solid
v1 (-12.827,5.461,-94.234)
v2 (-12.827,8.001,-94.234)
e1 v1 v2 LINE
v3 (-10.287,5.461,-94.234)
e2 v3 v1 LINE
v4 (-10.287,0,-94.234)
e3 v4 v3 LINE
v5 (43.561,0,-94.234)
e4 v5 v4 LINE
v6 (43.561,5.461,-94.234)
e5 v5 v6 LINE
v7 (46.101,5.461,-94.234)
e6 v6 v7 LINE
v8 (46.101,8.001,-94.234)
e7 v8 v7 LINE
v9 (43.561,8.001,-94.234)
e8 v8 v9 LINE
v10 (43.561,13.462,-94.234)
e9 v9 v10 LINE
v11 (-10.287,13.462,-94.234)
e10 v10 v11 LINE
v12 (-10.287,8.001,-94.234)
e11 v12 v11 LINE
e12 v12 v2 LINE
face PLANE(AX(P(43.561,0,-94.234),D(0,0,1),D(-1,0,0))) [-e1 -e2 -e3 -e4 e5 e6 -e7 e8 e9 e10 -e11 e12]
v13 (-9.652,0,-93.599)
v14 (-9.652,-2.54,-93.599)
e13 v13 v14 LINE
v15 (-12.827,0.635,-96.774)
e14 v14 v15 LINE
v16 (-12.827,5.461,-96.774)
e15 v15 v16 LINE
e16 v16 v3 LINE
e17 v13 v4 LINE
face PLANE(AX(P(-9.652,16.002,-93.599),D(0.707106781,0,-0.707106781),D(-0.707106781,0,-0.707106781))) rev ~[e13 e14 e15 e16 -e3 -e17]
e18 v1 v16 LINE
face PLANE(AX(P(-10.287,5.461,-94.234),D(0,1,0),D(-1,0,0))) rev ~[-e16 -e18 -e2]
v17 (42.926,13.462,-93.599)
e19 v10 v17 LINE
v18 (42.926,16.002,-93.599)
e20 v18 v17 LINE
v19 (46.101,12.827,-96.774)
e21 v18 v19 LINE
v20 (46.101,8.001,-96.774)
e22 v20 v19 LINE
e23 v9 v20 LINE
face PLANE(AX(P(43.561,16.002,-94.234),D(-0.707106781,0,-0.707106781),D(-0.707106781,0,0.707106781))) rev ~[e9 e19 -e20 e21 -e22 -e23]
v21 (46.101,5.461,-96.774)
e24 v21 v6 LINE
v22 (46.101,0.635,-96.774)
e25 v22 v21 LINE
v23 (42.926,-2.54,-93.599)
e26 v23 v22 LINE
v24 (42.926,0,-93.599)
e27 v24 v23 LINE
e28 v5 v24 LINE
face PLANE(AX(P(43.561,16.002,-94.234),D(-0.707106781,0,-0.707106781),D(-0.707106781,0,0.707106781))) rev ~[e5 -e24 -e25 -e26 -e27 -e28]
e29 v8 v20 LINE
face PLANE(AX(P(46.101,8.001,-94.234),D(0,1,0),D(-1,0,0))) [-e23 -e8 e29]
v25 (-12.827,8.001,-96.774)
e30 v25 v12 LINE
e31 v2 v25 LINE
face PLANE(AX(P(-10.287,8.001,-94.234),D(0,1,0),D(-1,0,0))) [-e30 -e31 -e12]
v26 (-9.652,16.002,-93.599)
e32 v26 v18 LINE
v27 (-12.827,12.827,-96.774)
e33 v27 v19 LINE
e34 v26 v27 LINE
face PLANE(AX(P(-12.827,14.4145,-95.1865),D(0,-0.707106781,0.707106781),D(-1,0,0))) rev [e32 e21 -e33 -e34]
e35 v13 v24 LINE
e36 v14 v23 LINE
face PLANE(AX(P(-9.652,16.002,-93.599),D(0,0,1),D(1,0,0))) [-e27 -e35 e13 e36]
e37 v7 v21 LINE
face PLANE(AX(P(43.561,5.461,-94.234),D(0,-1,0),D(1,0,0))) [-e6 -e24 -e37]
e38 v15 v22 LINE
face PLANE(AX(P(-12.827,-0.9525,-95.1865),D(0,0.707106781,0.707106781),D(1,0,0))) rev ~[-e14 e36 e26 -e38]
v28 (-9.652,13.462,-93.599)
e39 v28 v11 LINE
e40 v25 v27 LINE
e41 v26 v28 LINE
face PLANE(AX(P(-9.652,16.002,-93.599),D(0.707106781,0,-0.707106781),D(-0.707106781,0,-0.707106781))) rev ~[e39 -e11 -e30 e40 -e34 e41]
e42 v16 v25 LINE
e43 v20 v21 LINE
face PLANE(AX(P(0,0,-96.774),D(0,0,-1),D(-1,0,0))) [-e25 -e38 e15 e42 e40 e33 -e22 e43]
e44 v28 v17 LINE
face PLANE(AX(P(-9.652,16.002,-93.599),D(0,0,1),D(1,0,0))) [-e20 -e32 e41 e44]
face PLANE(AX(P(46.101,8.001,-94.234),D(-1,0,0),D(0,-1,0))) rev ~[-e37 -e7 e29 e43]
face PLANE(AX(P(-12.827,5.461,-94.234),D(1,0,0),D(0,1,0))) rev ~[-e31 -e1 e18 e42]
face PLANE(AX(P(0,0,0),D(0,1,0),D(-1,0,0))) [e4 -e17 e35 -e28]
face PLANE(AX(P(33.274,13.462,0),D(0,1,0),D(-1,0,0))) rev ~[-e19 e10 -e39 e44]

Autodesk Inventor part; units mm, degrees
ref_plane "YZ Plane" through (0, 0, 0) normal (1, 0, 0) x (0, 1, 0)
ref_plane "XZ Plane" through (0, 0, 0) normal (0, 1, 0) x (-1, 0, 0)
sketch "Sketch1" plane through (0, 0, 0) normal (0, 0, 1) x (1, 0, 0)
  line L0 (0, 0) -> (33.274, 0)
  line L1 (33.274, 0) -> (33.274, 13.462)
  line L2 (33.274, 13.462) -> (0, 13.462)
  line L3 (0, 13.462) -> (0, 0)
  line L4 (-2.54, 16.002) -> (35.814, 16.002)
  line L5 (35.814, 16.002) -> (35.814, -2.54)
  line L6 (35.814, -2.54) -> (-2.54, -2.54)
  line L7 (-2.54, -2.54) -> (-2.54, 16.002)
  dimension "d0" = 33.274
  dimension "d1" = 13.462
  dimension "d2" = 2.54
extrude "Extrusion1" add sketch "Sketch1" against normal blind 13.208
sketch "Sketch3" plane through (0, 0, 0) normal (0, 0, 1) x (1, 0, 0)
  line L0 (14.986, 16.002) -> (14.986, 13.462)
  line L1 (0, 13.462) -> (33.274, 13.462)
  line L2 (35.814, 16.002) -> (-2.54, 16.002)
  line L3 (-2.54, 16.002) -> (-2.54, -2.54)
  line L4 (18.288, 16.002) -> (18.288, 13.462)
  line L5 (35.814, -2.54) -> (35.814, 16.002)
  line L6 (14.986, 16.002) -> (18.288, 16.002)
  line L7 (18.288, 13.462) -> (14.986, 13.462)
  line L8 (33.274, 13.462) -> (33.274, 0)
  line L9 (0, 0) -> (0, 13.462)
  dimension "d5" = 0
  dimension "d6" = 0
  dimension "d7" = 14.986
  dimension "d8" = 14.986
extrude "Extrusion2" cut sketch "Sketch3" against normal blind 7.62
sketch "Sketch4" plane through (0, 0, 0) normal (0, 1, 0) x (-1, 0, 0)
  line L0 (10.287, -23.368) -> (-43.561, -23.368)
  line L1 (-43.561, -23.368) -> (-43.561, -94.234)
  line L2 (-43.561, -94.234) -> (10.287, -94.234)
  line L3 (10.287, -94.234) -> (10.287, -23.368)
  circle A0 centre (-41.529, -25.4) radius 1.016
  circle A1 centre (8.255, -25.4) radius 1.016
  circle A2 centre (8.255, -92.202) radius 1.016
  circle A3 centre (-41.529, -92.202) radius 1.016
  line L4 (-33.274, -13.208) -> (0, -13.208) projected
  line L5 (-16.637, -13.208) -> (-16.637, -16.4825)
  point P0 (0, 0)
  dimension "d11" = 53.848
  dimension "d12" = 70.866
  dimension "d14" = 2.032
  dimension "d15" = 2.032
  dimension "d16" = 2.032
  dimension "d17" = 2.032
  dimension "d18" = 2.032
  dimension "d19" = 2.032
  dimension "d20" = 2.032
  dimension "d21" = 2.032
  dimension "d22" = 2.032
  dimension "d23" = 2.032
  dimension "d24" = 2.032
  dimension "d25" = 2.032
  dimension "d26" = 26.924
  dimension "d27" = 10.16
ref_plane "Work Plane1" through (0, 0, -23.368) normal (0, 0, -1) x (-1, 0, 0)
sketch "Sketch5" plane through (0, 0, -23.368) normal (0, 0, -1) x (-1, 0, 0)
  line L0 (10.287, 0) -> (-43.561, 0) projected
  line L1 (-43.561, 0) -> (10.287, 0)
  line L2 (10.287, 13.462) -> (10.287, 0)
  line L3 (10.287, 0) -> (-43.561, 0)
  line L4 (12.827, -2.54) -> (-46.101, -2.54)
  line L5 (-46.101, -2.54) -> (-46.101, 16.002)
  line L6 (-46.101, -2.54) -> (12.827, -2.54)
  line L7 (12.827, -2.54) -> (12.827, 16.002)
  line L8 (12.827, 16.002) -> (-46.101, 16.002)
  line L9 (-46.101, 16.002) -> (-46.101, -2.54)
  line L10 (10.287, 0) -> (-43.561, 0)
  line L11 (-43.561, 0) -> (-43.561, 13.462)
  line L12 (-43.561, 13.462) -> (10.287, 13.462)
  line L13 (10.287, 13.462) -> (10.287, 0)
  point P0 (0, 0)
sketch "Sketch6" plane through (0, 0, -13.208) normal (0, 0, -1) x (-1, 0, 0)
  line L0 (-35.814, -2.54) -> (2.54, -2.54) projected
  line L1 (2.54, -2.54) -> (2.54, 16.002) projected
  line L2 (2.54, 16.002) -> (-35.814, 16.002) projected
  line L3 (-35.814, 16.002) -> (-35.814, -2.54) projected
  line L4 (0, 13.462) -> (0, 0) projected
  line L5 (0, 0) -> (-33.274, 0) projected
  line L6 (-33.274, 0) -> (-33.274, 13.462) projected
  line L7 (-33.274, 13.462) -> (0, 13.462) projected
extrude "Extrusion3" add sketch "Sketch5" along normal blind 73.406
sketch "Sketch7" plane through (0, 0, -23.368) normal (0, 0, 1) x (1, 0, 0)
  line L0 (46.101, 16.002) -> (46.101, -2.54) projected
  line L1 (-12.827, 16.002) -> (46.101, 16.002) projected
  line L2 (-12.827, -2.54) -> (-12.827, 16.002) projected
  line L3 (46.101, -2.54) -> (-12.827, -2.54) projected
  line L4 (43.561, 13.462) -> (-10.287, 13.462) projected
  line L5 (43.561, 0) -> (43.561, 13.462) projected
  line L6 (-10.287, 0) -> (43.561, 0) projected
  line L7 (-10.287, 13.462) -> (-10.287, 0) projected
  point P0 (0, 0)
sketch "Sketch8" plane through (0, 0, -23.368) normal (0, 0, 1) x (1, 0, 0)
  point P0 (0, 0)
sketch "Sketch9" plane through (0, 0, 0) normal (0, 1, 0) x (-1, 0, 0)
  line L0 (2.54, -13.208) -> (-35.814, -13.208) projected
  line L1 (12.827, -23.368) -> (2.54, -13.208)
  line L2 (2.54, -13.208) -> (-35.814, -13.208)
  line L3 (-45.8486, -23.368) -> (12.827, -23.368)
  line L4 (-35.814, 0) -> (-35.814, -13.208) projected
  line L5 (-46.101, -23.368) -> (12.827, -23.368) projected
  line L6 (-35.814, -13.208) -> (-46.101, -23.368)
  line L7 (-46.101, -23.368) -> (12.827, -23.368)
  point P0 (0, 0)
extrude "Extrusion5" add sketch "Sketch9" against normal blind 2.54
sketch "Sketch11" plane through (0, 0, 0) normal (0, 1, 0) x (1, 0, 0)
  line L0 (33.274, 0) -> (0, 0) projected
  line L1 (33.274, 0) -> (33.274, 13.208) projected
  line L2 (35.814, 13.208) -> (33.274, 13.208) projected
  line L3 (35.814, 13.208) -> (46.101, 23.368) projected
  line L4 (43.561, 23.368) -> (46.101, 23.368) projected
  line L5 (43.561, 23.368) -> (43.561, 96.774) projected
  line L6 (-10.287, 96.774) -> (43.561, 96.774) projected
  line L7 (-10.287, 23.368) -> (-10.287, 96.774) projected
  line L8 (-12.827, 23.368) -> (-10.287, 23.368) projected
  line L9 (-12.827, 23.368) -> (-2.54, 13.208) projected
  line L10 (0, 13.208) -> (-2.54, 13.208) projected
  line L11 (0, 0) -> (0, 13.208) projected
  line L12 (-12.827, 23.368) -> (-2.54, 13.208) projected
  line L13 (-11.0421, 25.1752) -> (0, 14.2694)
  line L14 (0, 0) -> (0, 13.208) projected
  line L15 (0, 13.208) -> (0, 14.2694)
  line L16 (-10.287, 23.368) -> (-10.287, 96.774) projected
  line L17 (-10.287, 24.4294) -> (-10.287, 23.368)
  line L18 (-12.827, 23.368) -> (-10.287, 23.368) projected
  line L19 (-10.287, 23.368) -> (-12.827, 23.368)
  line L20 (-2.54, 0) -> (-2.54, 13.208) projected
  line L21 (-12.827, 23.368) -> (-2.54, 13.208)
  line L22 (-2.54, 13.208) -> (0, 13.208)
  line L23 (16.637, 13.208) -> (16.637, 17.9384)
  line L24 (46.101, 23.368) -> (43.561, 23.368)
  line L25 (46.101, 23.368) -> (35.814, 13.208)
  line L26 (44.3161, 25.1752) -> (33.274, 14.2694)
  line L27 (33.274, 13.208) -> (33.274, 14.2694)
  line L28 (43.561, 24.4294) -> (43.561, 23.368)
  line L29 (35.814, 13.208) -> (33.274, 13.208)
  point P0 (43.561, 24.4294)
  dimension "d40" = 2.54
extrude "Extrusion7" add sketch "Sketch11" along normal up to surface (13.462 mm away) contours L27 L26 L5 L4 L3 L2 | L10 L9 L8 L7 L13 L15
sketch "Sketch12" plane through (-12.827, 13.462, -23.368) normal (0, 1, 0) x (1, 0, 0)
  line L0 (58.928, 0) -> (55.3134, 0) projected
  line L1 (55.3134, 0) -> (46.101, -9.0986) projected
  line L2 (46.101, -9.0986) -> (46.101, -10.16) projected
  line L3 (48.641, -10.16) -> (46.101, -10.16) projected
  line L4 (48.641, -10.16) -> (58.928, 0) projected
  line L5 (3.6146, 0) -> (0, 0) projected
  line L6 (0, 0) -> (10.287, -10.16) projected
  line L7 (12.827, -10.16) -> (10.287, -10.16) projected
  line L8 (12.827, -10.16) -> (12.827, -9.0986) projected
  line L9 (12.827, -9.0986) -> (3.6146, 0) projected
  line L10 (12.827, -23.368) -> (12.827, -10.16) projected
  line L11 (12.827, -10.16) -> (46.101, -10.16)
  line L12 (55.3134, 0) -> (3.6146, 0) projected
  line L13 (55.3134, 0) -> (3.6146, 0)
extrude "Extrusion8" add sketch "Sketch12" along normal blind 2.54
sketch "Sketch13" plane through (0, 0, 0) normal (0, 1, 0) x (1, 0, 0)
  line L0 (43.561, 94.234) -> (-10.287, 94.234) projected
  line L1 (46.101, 96.774) -> (-12.827, 96.774) projected
  line L2 (-10.287, 94.234) -> (43.561, 94.234)
  line L3 (43.561, 94.234) -> (43.561, 96.774)
  line L4 (43.561, 96.774) -> (-10.287, 96.774)
  line L5 (-10.287, 96.774) -> (-10.287, 94.234)
  point P0 (0, 0)
  point P1 (-10.287, 96.774)
extrude "Extrusion9" add sketch "Sketch13" along normal up to next
chamfer "Chamfer1" distance 3.175 angle 45 14 edges at (-12.827, 16.002, -60.071) (46.101, 16.002, -60.071) (46.101, -2.54, -60.071) (-12.827, -2.54, -60.071) (16.637, 16.002, -96.774) (16.637, -2.54, -96.774) (40.9575, 16.002, -18.288) (40.9575, -2.54, -18.288) (-7.6835, 16.002, -18.288) (-7.6835, -2.54, -18.288) (35.814, 16.002, -6.604) (35.814, -2.54, -6.604) (-2.54, 16.002, -6.604) (-2.54, -2.54, -6.604)
sketch "Sketch15" plane through (14.986, 16.002, -7.62) normal (0, 1, 0) x (1, 0, 0)
  line L0 (17.653, 6.9147) -> (17.653, -7.62)
  line L1 (17.653, -7.62) -> (20.828, -7.62)
  line L2 (20.828, -7.62) -> (20.828, 5.588)
  line L3 (20.828, 5.588) -> (17.653, 6.9147)
  line L4 (17.653, 6.9147) -> (17.653, -7.62)
  line L5 (27.94, 17.0747) -> (17.653, 6.9147)
  line L6 (27.94, 85.979) -> (27.94, 17.0747)
  line L7 (-24.638, 85.979) -> (27.94, 85.979)
  line L8 (-24.638, 17.0747) -> (-24.638, 85.979)
  line L9 (-14.351, 6.9147) -> (-24.638, 17.0747)
  line L10 (-14.351, -7.62) -> (-14.351, 6.9147)
  line L11 (0, -7.62) -> (-14.351, -7.62)
  line L12 (0, -7.62) -> (0, 0)
  line L13 (0, 0) -> (3.302, 0)
  line L14 (3.302, 0) -> (3.302, -7.62)
  line L15 (17.653, -7.62) -> (3.302, -7.62)
  line L16 (-17.526, 5.588) -> (-17.526, -7.62)
  line L17 (-17.526, -7.62) -> (-14.351, -7.62)
  line L18 (-14.351, -7.62) -> (-14.351, 6.9147)
  line L19 (-14.351, 6.9147) -> (-17.526, 5.588)
  line L20 (-14.351, 6.9147) -> (-24.638, 17.0747)
  line L21 (-24.638, 17.0747) -> (-27.813, 15.748)
  line L22 (-27.813, 15.748) -> (-17.526, 5.588)
  line L23 (-14.351, 6.9147) -> (-17.526, 5.588)
  line L24 (-27.813, 89.154) -> (-27.813, 15.748)
  line L25 (-24.638, 17.0747) -> (-27.813, 15.748)
  line L26 (-24.638, 17.0747) -> (-24.638, 85.979)
  line L27 (-24.638, 85.979) -> (-27.813, 89.154)
  line L28 (31.115, 15.748) -> (31.115, 89.154)
  line L29 (-25.273, 16.8094) -> (-25.273, 86.614)
  line L30 (-25.273, 16.8094) -> (-14.986, 6.6494)
  line L31 (-14.986, -7.62) -> (-14.986, 6.6494)
  line L32 (18.288, -7.62) -> (-14.986, -7.62)
  line L33 (18.288, -7.62) -> (18.288, 6.6494)
  line L34 (18.288, 6.6494) -> (28.575, 16.8094)
  line L35 (28.575, 16.8094) -> (28.575, 86.614)
  line L36 (20.828, 5.588) -> (31.115, 15.748)
  line L37 (20.828, 5.588) -> (31.115, 15.748)
  line L38 (27.94, 17.0747) -> (31.115, 15.748)
  line L39 (27.94, 17.0747) -> (17.653, 6.9147)
  line L40 (20.828, 5.588) -> (17.653, 6.9147)
  line L41 (31.115, 15.748) -> (31.115, 89.154)
  line L42 (31.115, 89.154) -> (27.94, 85.979)
  line L43 (27.94, 85.979) -> (27.94, 17.0747)
  line L44 (27.94, 17.0747) -> (31.115, 15.748)
extrude "Extrusion10" cut sketch "Sketch15" against normal through all
sketch "Sketch16" plane through (-10.287, 0, -94.234) normal (0, 0, 1) x (1, 0, 0)
  line L0 (0, 0) -> (0.635, 0) projected
  line L1 (0, 0) -> (0, 13.462) projected
  line L2 (0.635, 13.462) -> (0, 13.462) projected
  line L3 (0.635, 16.002) -> (0.635, 13.462) projected
  line L4 (0.635, 16.002) -> (-2.54, 12.827) projected
  line L5 (-2.54, 0.635) -> (-2.54, 12.827) projected
  line L6 (-2.54, 0.635) -> (0.635, -2.54) projected
  line L7 (0.635, 0) -> (0.635, -2.54) projected
  line L8 (53.213, 0) -> (53.848, 0) projected
  line L9 (53.213, 0) -> (53.213, -2.54) projected
  line L10 (53.213, -2.54) -> (56.388, 0.635) projected
  line L11 (56.388, 12.827) -> (56.388, 0.635) projected
  line L12 (56.388, 12.827) -> (53.213, 16.002) projected
  line L13 (53.213, 16.002) -> (53.213, 13.462) projected
  line L14 (53.848, 13.462) -> (53.213, 13.462) projected
  line L15 (53.848, 13.462) -> (53.848, 0) projected
  line L16 (0, 0) -> (0, 13.462) projected
  line L17 (-2.54, 0.635) -> (-2.54, 12.827) projected
  line L18 (0, 8.001) -> (-2.54, 8.001)
  line L19 (0, 5.461) -> (-2.54, 5.461)
  line L20 (-2.54, 8.001) -> (0, 8.001)
  line L21 (0, 8.001) -> (0, 5.461)
  line L22 (0, 5.461) -> (-2.54, 5.461)
  line L23 (-2.54, 5.461) -> (-2.54, 8.001)
  line L24 (53.848, 13.462) -> (53.848, 0) projected
  line L25 (56.388, 12.827) -> (56.388, 0.635) projected
  line L26 (53.848, 5.461) -> (56.388, 5.461)
  line L27 (56.388, 5.461) -> (56.388, 8.001)
  line L28 (56.388, 8.001) -> (53.848, 8.001)
  line L29 (53.848, 8.001) -> (53.848, 5.461)
  point P0 (10.287, 0)
  point P1 (-2.54, 5.461)
  point P2 (0, 5.461)
  point P3 (0, 8.001)
  point P4 (-2.54, 8.001)
extrude "Extrusion11" add sketch "Sketch16" against normal up to surface (2.54 mm away) contours L19 L5 L18 L1 | L15 L28 L11 L26
properties part number "Cap"
